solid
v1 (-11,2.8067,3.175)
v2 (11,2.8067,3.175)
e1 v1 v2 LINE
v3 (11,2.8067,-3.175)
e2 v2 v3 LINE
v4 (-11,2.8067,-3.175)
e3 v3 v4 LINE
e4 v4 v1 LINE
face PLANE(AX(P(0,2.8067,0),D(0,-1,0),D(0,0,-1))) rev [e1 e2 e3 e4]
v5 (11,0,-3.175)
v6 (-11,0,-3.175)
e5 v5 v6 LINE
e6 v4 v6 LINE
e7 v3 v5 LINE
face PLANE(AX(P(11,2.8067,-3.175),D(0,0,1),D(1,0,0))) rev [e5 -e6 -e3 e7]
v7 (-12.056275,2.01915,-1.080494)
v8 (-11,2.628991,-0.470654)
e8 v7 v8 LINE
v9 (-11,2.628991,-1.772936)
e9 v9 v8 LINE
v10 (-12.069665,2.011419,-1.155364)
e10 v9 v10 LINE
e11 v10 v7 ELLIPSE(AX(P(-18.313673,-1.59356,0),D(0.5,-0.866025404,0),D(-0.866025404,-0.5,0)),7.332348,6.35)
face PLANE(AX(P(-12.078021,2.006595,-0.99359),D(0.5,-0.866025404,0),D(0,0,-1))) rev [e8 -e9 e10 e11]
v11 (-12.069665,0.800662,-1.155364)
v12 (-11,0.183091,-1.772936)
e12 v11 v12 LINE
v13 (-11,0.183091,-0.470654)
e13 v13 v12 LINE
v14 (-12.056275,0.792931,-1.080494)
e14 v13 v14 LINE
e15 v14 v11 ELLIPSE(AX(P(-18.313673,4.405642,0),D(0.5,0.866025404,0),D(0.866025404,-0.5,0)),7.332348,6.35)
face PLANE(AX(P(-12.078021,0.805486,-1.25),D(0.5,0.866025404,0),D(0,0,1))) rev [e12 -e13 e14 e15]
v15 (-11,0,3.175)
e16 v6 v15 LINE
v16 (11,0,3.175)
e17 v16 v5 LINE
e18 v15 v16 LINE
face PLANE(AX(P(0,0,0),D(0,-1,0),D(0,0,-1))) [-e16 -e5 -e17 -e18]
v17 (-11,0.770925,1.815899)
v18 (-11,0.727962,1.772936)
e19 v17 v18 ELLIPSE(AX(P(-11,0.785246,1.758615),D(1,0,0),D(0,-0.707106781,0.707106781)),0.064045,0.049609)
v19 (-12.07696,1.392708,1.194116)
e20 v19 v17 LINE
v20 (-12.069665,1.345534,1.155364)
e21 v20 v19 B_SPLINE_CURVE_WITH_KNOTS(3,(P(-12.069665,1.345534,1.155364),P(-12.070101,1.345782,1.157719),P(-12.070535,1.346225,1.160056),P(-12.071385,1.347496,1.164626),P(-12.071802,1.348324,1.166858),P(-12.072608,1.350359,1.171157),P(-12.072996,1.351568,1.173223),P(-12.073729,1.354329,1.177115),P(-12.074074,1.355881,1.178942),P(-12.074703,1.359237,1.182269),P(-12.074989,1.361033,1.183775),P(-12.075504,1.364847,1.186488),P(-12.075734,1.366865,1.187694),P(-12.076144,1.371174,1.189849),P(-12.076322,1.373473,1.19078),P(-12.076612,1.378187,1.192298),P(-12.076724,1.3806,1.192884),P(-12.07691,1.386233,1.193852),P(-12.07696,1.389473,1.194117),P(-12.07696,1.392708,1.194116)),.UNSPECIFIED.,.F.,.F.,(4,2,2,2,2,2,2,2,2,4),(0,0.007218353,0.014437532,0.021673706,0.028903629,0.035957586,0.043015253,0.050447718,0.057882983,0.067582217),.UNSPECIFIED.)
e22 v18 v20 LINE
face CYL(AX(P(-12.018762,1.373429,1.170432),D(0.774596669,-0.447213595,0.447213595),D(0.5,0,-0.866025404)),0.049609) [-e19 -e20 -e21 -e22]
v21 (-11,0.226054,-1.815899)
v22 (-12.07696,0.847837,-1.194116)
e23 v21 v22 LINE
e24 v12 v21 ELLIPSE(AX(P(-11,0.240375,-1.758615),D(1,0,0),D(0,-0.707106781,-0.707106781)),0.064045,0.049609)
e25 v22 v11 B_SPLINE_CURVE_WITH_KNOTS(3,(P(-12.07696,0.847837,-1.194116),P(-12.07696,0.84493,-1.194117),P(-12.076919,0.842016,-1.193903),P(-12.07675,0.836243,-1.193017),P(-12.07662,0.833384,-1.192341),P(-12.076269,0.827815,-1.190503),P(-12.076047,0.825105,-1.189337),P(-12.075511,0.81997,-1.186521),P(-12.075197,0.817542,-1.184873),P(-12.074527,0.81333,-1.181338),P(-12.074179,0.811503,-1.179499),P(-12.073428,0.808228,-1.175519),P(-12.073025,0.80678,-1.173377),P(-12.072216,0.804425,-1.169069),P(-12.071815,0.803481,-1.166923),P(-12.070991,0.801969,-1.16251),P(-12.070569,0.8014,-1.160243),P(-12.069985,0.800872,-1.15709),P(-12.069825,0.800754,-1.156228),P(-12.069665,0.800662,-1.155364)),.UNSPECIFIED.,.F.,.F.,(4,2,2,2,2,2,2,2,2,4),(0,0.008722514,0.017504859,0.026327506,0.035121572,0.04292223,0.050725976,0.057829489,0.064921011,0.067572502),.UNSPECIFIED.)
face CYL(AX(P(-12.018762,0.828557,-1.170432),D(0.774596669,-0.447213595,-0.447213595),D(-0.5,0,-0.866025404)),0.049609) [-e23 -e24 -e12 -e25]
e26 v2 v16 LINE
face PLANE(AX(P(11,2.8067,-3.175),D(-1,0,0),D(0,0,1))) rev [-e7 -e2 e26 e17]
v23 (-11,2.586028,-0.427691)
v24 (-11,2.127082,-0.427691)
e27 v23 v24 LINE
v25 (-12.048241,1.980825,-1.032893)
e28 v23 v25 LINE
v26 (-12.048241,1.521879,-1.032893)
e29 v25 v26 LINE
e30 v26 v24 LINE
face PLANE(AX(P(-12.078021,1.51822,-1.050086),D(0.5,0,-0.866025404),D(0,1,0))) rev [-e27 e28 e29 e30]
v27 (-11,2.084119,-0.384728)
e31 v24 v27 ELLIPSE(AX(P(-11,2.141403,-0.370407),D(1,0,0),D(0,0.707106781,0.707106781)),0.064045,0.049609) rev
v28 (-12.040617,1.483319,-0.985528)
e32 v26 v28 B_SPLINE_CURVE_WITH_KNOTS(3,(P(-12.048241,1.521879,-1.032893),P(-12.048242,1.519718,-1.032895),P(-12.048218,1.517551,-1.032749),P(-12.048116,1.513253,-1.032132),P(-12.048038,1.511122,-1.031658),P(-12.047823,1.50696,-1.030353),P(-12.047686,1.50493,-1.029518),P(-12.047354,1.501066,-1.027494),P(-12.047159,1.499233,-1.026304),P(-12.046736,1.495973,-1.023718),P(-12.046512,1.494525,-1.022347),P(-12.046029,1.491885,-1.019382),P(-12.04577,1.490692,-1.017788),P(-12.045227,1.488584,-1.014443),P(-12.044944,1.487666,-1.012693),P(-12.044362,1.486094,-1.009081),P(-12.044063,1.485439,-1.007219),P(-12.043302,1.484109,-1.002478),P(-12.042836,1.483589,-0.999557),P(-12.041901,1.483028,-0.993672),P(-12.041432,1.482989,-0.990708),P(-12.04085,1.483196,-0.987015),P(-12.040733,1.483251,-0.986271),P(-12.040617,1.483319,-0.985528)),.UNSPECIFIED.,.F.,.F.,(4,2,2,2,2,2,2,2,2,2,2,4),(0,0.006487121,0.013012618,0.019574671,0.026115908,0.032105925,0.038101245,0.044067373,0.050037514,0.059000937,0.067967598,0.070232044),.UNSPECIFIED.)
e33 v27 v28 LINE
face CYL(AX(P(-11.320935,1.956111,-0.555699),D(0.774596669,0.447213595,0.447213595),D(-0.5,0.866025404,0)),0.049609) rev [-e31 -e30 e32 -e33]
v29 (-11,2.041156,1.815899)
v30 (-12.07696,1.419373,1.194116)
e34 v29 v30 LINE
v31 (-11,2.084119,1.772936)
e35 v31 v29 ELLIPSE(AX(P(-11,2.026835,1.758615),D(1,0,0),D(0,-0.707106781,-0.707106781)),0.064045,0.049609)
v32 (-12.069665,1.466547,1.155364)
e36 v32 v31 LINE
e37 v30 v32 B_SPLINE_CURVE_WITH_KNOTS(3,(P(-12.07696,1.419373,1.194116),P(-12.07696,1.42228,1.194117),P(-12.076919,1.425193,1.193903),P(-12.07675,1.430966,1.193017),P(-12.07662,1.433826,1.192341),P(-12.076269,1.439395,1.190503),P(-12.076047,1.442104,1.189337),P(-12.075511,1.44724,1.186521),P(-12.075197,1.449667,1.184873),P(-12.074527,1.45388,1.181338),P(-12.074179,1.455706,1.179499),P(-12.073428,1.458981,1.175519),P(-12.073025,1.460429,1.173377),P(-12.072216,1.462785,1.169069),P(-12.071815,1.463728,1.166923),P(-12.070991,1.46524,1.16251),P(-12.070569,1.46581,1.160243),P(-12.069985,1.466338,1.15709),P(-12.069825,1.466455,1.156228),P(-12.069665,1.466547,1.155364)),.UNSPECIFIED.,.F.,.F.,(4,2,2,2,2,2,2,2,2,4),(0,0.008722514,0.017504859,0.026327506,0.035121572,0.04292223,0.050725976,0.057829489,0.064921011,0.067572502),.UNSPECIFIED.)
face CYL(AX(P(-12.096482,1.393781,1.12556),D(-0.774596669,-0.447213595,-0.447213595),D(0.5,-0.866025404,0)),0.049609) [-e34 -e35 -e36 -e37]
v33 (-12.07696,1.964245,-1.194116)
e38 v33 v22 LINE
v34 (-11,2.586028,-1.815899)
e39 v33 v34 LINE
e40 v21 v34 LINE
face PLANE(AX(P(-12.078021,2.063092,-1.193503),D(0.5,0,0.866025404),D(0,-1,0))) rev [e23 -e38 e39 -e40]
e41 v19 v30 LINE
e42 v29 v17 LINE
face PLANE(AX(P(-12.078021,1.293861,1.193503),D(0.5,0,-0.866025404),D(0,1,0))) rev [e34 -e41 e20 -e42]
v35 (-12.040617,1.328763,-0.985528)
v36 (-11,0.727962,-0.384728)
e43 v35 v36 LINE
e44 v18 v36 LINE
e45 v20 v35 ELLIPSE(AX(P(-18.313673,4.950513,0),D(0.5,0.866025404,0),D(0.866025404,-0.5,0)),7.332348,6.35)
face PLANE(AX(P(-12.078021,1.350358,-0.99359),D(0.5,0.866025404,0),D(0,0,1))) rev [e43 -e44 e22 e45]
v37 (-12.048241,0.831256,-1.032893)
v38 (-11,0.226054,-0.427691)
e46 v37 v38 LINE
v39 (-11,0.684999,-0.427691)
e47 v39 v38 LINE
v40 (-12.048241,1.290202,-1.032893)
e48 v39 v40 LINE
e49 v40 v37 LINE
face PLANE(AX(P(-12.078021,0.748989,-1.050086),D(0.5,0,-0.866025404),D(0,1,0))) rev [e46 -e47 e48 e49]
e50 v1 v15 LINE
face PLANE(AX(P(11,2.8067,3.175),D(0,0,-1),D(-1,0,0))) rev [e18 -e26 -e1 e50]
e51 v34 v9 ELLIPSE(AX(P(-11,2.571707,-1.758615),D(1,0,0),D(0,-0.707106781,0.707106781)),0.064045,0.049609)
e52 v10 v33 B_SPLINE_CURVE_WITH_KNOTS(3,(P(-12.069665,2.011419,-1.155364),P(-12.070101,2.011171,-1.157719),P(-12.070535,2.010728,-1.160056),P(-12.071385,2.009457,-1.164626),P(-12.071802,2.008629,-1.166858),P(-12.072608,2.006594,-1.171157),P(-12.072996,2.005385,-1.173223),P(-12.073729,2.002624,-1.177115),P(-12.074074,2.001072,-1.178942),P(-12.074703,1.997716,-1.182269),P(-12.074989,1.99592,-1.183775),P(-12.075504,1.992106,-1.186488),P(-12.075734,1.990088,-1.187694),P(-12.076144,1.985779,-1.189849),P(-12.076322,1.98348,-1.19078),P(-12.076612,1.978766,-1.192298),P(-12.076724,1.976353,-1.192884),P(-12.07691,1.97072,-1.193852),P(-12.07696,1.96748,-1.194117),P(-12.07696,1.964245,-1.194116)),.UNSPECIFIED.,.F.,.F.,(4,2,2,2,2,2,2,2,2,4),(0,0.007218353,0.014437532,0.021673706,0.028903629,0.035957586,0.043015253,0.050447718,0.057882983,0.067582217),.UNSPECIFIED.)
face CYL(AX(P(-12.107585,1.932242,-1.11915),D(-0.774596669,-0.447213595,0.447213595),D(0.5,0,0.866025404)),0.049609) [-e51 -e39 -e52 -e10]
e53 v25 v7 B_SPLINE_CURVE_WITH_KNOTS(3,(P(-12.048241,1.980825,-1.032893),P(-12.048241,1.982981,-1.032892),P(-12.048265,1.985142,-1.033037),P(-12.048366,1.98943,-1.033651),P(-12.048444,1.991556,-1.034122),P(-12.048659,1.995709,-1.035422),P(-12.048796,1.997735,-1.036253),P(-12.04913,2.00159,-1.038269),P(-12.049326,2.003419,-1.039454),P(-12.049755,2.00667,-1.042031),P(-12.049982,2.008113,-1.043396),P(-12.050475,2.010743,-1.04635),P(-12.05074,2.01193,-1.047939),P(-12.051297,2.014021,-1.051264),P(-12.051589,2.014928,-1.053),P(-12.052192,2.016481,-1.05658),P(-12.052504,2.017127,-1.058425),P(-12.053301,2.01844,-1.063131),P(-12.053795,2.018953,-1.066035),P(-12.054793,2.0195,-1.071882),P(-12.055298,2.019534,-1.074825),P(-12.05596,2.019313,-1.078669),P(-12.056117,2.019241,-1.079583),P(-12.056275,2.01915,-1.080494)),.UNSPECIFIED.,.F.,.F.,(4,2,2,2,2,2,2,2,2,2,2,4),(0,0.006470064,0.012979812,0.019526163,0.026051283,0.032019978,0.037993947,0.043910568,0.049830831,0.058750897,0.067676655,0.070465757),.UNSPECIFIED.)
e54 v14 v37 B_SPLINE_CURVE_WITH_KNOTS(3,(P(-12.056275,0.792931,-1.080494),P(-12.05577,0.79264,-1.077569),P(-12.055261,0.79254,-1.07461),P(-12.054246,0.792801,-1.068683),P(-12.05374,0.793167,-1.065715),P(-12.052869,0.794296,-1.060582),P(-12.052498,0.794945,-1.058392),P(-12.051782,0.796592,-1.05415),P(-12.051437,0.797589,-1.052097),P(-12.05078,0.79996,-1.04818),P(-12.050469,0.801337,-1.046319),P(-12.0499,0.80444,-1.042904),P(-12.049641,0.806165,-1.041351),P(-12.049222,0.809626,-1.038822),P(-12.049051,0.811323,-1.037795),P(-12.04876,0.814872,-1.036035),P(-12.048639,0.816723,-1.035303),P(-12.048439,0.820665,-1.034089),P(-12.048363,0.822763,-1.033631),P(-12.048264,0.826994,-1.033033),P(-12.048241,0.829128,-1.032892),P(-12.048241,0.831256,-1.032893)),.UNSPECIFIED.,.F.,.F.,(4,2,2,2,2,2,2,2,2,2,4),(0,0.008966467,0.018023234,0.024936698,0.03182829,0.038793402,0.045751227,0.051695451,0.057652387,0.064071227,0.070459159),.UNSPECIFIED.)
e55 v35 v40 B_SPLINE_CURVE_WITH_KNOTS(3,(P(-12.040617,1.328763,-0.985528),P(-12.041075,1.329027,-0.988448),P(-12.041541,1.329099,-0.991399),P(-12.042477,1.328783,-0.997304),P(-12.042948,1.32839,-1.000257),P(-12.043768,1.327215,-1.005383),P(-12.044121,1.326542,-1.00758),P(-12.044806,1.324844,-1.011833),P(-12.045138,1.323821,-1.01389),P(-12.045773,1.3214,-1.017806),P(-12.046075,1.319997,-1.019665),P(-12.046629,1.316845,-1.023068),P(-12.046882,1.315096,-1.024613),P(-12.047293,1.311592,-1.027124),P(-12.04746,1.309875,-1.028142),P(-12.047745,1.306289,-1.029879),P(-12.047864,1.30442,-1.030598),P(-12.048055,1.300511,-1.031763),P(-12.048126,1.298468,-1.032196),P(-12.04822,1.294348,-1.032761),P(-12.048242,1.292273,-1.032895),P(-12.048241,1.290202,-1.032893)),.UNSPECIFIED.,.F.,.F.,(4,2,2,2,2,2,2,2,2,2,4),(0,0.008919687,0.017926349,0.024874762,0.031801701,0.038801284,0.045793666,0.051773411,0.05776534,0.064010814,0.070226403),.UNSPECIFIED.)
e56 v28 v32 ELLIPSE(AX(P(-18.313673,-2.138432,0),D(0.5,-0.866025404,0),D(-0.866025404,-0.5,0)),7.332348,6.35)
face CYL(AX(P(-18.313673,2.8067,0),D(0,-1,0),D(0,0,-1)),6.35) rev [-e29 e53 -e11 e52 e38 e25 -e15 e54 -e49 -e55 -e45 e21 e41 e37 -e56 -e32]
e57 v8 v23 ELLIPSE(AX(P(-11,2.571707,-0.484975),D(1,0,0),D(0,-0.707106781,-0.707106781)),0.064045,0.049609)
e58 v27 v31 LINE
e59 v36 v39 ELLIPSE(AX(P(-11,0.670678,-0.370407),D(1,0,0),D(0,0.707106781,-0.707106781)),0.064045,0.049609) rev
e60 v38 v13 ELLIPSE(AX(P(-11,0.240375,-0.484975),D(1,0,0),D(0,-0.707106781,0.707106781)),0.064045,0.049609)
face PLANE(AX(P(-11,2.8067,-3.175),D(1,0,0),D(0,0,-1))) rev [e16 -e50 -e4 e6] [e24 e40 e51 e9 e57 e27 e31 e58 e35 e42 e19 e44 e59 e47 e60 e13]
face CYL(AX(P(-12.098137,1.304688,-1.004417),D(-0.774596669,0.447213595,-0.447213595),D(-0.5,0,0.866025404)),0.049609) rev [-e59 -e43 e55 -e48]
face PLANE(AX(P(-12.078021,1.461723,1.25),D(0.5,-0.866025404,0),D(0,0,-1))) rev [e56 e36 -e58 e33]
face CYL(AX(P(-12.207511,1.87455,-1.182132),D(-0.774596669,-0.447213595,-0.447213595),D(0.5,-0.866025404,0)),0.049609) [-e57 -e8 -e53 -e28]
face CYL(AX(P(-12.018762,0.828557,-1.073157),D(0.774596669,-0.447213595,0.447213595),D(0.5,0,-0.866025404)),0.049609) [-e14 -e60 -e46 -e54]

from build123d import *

# Parameters (mm, degrees)
CROQUIS1_W              = 22
CROQUIS1_H              = 6.35
SALIENTE_EXTRUIR1_DEPTH = 2.8067
SALIENTE_EXTRUIR2_DEPTH = 1.07696
SALIENTE_EXTRUIR2_TAPER = 3
REDONDEO1_R             = 0.049609375
CORTAR_EXTRUIR1_DEPTH   = 13.798873245


with BuildPart() as part:
    # Croquis1 → Saliente-Extruir1 (new body)
    with BuildSketch(Plane(origin=(0, 0, 0), x_dir=(1, 0, 0), z_dir=(0, 1, 0))):
        Rectangle(CROQUIS1_W, CROQUIS1_H)
    extrude(amount=SALIENTE_EXTRUIR1_DEPTH)

    # Croquis2 → Saliente-Extruir2 (add)
    with BuildSketch(Plane.ZY.offset(11)):
        Polygon((-0.993589744, 2.063091923), (-1.25, 2.063091923), (-1.25, 0.748989359), (-0.993589744, 0.748989359), (-0.993589744, 1.293861154), (1.25, 1.293861154), (1.25, 1.518220128), (-0.993589744, 1.518220128), align=None)
    extrude(amount=SALIENTE_EXTRUIR2_DEPTH, taper=SALIENTE_EXTRUIR2_TAPER)

    # Chaflán1: read off the stored shape, not the designer's step
    # Chaflán1: loft between two sections, ruled curve by curve
    chafl_n1_from = [
        Edge.make_line((-12.07696, 2.007207586, -1.194115663), (-12.07696, 0.804873696, -1.194115663)),
        Edge.make_line((-12.07696, 0.804873696, -1.194115663), (-12.07696, 0.804873696, -1.049474081)),
        Edge.make_line((-12.07696, 2.007207586, -1.194115663), (-12.07696, 2.007207586, -1.049474081)),
        Edge.make_line((-12.07696, 0.804873696, -1.049474081), (-12.07696, 1.349745491, -1.049474081)),
        Edge.make_line((-12.07696, 2.007207586, -1.049474081), (-12.07696, 1.462335791, -1.049474081)),
        Edge.make_line((-12.07696, 1.349745491, -1.049474081), (-12.07696, 1.349745491, 1.194115663)),
        Edge.make_line((-12.07696, 1.462335791, -1.049474081), (-12.07696, 1.462335791, 1.194115663)),
        Edge.make_line((-12.07696, 1.349745491, 1.194115663), (-12.07696, 1.462335791, 1.194115663)),
    ]
    chafl_n1_to = [
        Edge.make_line((-11, 2.628990732, -1.815898809), (-11, 0.18309055, -1.815898809)),
        Edge.make_line((-11, 0.18309055, -1.815898809), (-11, 0.18309055, -0.427690935)),
        Edge.make_line((-11, 2.628990732, -1.815898809), (-11, 2.628990732, -0.427690935)),
        Edge.make_line((-11, 0.18309055, -0.427690935), (-11, 0.727962345, -0.427690935)),
        Edge.make_line((-11, 2.628990732, -0.427690935), (-11, 2.084118937, -0.427690935)),
        Edge.make_line((-11, 0.727962345, -0.427690935), (-11, 0.727962345, 1.815898809)),
        Edge.make_line((-11, 2.084118937, -0.427690935), (-11, 2.084118937, 1.815898809)),
        Edge.make_line((-11, 0.727962345, 1.815898809), (-11, 2.084118937, 1.815898809)),
    ]
    chafl_n1 = Solid(Shell([*[Face.make_surface_from_curves(chafl_n1_from[k], chafl_n1_to[k]) for k in range(8)], Face(Wire(chafl_n1_from)), Face(Wire(chafl_n1_to))]))
    add(chafl_n1)

    # Redondeo1
    redondeo1_edges = [part.edges().sort_by_distance(p)[0] for p in [
        (-11.53848, 0.493982123, -1.505007236),
        (-11.53848, 2.318099159, -1.505007236),
        (-11.53848, 0.493982123, -0.738582508),
        (-11.53848, 2.318099159, -0.738582508),
        (-11.53848, 1.038853918, -0.738582508),
        (-11.53848, 1.773227364, -0.738582508),
        (-11.53848, 1.038853918, 1.505007236),
        (-11.53848, 1.773227364, 1.505007236),
    ]]
    fillet(redondeo1_edges, radius=REDONDEO1_R)

    # Croquis5 → Cortar-Extruir1 (cut, through all)
    with BuildSketch(Plane.XZ):
        with BuildLine():
            Line((-12.07696, -1.194115663), (-12.07696, 1.194115663))
            ThreePointArc((-12.07696, 1.194115663), (-11.963672899, 0), (-12.07696, -1.194115663))
        make_face()
    extrude(amount=-CORTAR_EXTRUIR1_DEPTH, mode=Mode.SUBTRACT)


solid = part.part
